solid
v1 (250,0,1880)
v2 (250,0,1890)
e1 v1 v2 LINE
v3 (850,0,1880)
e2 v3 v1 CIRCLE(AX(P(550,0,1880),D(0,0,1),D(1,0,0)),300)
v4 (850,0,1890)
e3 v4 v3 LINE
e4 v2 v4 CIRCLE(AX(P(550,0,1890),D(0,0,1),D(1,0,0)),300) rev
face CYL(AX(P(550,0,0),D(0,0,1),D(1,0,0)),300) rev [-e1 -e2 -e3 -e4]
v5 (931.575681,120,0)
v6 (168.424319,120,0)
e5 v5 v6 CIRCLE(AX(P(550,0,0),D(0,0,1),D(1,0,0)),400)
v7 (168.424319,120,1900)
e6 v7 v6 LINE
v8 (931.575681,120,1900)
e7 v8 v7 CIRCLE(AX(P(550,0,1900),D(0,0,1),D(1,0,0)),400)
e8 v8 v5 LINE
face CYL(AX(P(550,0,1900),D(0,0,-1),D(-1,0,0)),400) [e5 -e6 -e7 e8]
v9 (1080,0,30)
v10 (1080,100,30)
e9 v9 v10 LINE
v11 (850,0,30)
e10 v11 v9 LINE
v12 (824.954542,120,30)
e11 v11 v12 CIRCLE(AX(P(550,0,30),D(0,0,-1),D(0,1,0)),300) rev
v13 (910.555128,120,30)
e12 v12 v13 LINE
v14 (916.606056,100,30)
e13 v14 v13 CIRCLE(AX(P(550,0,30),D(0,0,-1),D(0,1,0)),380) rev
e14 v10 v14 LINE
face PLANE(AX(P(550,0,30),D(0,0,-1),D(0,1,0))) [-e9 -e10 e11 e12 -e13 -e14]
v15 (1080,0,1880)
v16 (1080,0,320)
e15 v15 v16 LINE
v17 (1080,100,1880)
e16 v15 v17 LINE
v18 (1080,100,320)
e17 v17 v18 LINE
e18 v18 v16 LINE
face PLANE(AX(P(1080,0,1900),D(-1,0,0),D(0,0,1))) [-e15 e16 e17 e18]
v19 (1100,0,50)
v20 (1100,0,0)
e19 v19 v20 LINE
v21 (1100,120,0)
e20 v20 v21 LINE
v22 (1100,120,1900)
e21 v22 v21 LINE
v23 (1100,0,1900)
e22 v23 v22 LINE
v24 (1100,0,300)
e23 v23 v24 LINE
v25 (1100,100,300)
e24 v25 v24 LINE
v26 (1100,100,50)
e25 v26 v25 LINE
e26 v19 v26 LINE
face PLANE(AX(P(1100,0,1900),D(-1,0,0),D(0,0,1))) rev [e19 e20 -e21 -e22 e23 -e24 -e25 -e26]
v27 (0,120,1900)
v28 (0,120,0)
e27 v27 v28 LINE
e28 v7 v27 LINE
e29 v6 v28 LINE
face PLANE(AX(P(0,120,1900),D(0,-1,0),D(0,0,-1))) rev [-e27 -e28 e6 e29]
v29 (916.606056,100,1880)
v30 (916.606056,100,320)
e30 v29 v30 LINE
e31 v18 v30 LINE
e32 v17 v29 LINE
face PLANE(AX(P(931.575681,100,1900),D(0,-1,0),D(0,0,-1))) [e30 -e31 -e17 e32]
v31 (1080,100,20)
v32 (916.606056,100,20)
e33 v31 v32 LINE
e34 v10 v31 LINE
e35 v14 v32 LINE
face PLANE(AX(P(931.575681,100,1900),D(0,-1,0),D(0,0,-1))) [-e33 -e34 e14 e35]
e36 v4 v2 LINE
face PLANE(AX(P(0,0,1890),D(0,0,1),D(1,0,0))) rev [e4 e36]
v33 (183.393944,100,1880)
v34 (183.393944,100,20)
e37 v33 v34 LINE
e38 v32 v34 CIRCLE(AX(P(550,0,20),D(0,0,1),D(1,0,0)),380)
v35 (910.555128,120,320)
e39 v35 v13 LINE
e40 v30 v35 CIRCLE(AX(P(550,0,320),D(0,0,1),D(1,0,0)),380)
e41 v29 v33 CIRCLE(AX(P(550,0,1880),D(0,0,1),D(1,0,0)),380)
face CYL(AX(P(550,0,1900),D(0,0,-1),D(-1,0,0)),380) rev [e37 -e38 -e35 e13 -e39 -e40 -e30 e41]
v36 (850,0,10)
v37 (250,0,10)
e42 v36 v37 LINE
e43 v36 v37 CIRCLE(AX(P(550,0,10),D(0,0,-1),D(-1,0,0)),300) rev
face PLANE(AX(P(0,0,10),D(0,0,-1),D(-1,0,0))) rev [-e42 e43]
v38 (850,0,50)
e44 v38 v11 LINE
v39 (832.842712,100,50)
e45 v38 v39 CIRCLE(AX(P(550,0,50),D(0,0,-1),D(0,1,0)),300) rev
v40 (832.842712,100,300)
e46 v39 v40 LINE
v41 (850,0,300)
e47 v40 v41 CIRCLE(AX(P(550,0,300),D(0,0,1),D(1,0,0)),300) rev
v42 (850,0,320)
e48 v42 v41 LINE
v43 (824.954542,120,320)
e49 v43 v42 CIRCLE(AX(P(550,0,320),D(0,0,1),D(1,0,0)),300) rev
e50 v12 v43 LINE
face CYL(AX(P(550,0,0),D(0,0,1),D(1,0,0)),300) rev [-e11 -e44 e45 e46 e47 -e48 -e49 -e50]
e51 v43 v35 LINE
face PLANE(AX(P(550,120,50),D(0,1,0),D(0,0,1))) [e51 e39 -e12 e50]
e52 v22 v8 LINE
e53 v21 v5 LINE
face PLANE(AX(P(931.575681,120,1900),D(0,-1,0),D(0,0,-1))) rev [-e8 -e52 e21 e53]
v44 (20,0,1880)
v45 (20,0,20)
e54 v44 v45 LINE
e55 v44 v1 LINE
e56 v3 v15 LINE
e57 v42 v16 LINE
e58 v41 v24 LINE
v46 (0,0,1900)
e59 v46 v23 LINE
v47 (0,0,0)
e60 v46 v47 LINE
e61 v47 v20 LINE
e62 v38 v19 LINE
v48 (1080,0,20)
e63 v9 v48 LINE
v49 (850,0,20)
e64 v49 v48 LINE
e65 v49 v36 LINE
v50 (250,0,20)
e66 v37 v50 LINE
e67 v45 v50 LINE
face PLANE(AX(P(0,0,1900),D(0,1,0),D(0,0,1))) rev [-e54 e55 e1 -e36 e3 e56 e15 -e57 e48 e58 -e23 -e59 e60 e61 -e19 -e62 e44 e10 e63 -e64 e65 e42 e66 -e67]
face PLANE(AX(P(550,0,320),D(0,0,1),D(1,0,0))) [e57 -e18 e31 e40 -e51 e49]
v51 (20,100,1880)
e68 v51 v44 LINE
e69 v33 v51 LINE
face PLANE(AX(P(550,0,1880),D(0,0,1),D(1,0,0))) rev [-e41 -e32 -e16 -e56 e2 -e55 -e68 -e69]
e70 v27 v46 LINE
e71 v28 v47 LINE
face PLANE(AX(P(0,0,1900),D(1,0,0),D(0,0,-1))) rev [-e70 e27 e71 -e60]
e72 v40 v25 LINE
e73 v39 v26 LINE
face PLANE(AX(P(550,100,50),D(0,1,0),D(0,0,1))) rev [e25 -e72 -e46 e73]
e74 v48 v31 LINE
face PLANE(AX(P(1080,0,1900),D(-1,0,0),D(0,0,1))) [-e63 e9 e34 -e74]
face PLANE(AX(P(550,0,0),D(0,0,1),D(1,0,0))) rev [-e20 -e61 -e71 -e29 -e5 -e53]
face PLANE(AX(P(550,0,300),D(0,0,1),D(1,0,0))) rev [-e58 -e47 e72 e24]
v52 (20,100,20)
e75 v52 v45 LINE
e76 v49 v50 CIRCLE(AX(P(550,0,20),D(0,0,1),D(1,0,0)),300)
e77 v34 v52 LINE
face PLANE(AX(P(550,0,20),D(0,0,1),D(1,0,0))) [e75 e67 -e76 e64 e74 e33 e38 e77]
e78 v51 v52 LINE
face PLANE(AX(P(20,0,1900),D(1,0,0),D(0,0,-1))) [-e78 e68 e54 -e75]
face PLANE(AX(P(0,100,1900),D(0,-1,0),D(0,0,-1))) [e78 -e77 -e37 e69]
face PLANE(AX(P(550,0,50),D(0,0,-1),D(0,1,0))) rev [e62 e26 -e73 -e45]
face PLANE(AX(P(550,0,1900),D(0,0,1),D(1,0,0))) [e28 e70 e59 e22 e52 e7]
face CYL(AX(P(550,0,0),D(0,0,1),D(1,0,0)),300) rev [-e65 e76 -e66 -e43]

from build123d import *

# Parameters (mm, degrees)
BOSS_EXTRUDE1_DEPTH = 1900
SKETCH2_R           = 300
CUT_EXTRUDE1_DEPTH  = 2232.591360442
SKETCH4_W           = 250
SKETCH4_H           = 100
CUT_EXTRUDE3_DEPTH  = 550
SHELL1_START        = 320
SHELL1_DEPTH        = 1560
SHELL1_START_2      = 20
SHELL1_2_DEPTH      = 300
SHELL1_3_DEPTH      = 10
BOSS_EXTRUDE2_START = -10
BOSS_EXTRUDE2_DEPTH = 10
BOSS_EXTRUDE3_DEPTH = 10


# Read off the part's stored shape, not the designer's step: Shell1
with BuildPart() as part:
    # Sketch1 → Boss-Extrude1 (new body)
    with BuildSketch(Plane.XY):
        with BuildLine():
            Line((931.575680567, 120), (1100, 120))
            Line((1100, 120), (1100, 0))
            Line((1100, 0), (0, 0))
            Line((0, 0), (0, 120))
            Line((0, 120), (168.424319433, 120))
            ThreePointArc((168.424319433, 120), (550, 400), (931.575680567, 120))
        make_face()
    extrude(amount=BOSS_EXTRUDE1_DEPTH)

    # Sketch2 → Cut-Extrude1 (cut, through all)
    with BuildSketch(Plane.XY.offset(1900)):
        with Locations((550, 0)):
            Circle(SKETCH2_R)
    extrude(amount=-CUT_EXTRUDE1_DEPTH, mode=Mode.SUBTRACT)

    # Sketch4 → Cut-Extrude3 (cut)
    with BuildSketch(Plane(origin=(1100, 0, 0), x_dir=(0, 0, -1), z_dir=(1, 0, 0))):
        with Locations((-175, 50)):
            Rectangle(SKETCH4_W, SKETCH4_H)
    extrude(amount=-CUT_EXTRUDE3_DEPTH, mode=Mode.SUBTRACT)

    # Shell1 outline → Shell1 (cut)
    with BuildSketch(Plane.XY.offset(SHELL1_START)):
        with BuildLine():
            ThreePointArc((916.606055596, 100), (550, 380), (183.393944404, 100))
            Line((183.393944404, 100), (20, 100))
            Line((20, 100), (20, 0))
            Line((20, 0), (250, 0))
            ThreePointArc((250, 0), (550, 300), (850, 0))
            Line((850, 0), (1080, 0))
            Line((1080, 0), (1080, 100))
            Line((1080, 100), (916.606055596, 100))
        make_face()
    extrude(amount=SHELL1_DEPTH, mode=Mode.SUBTRACT)

    # Shell1 2 outline → Shell1 2 (cut)
    with BuildSketch(Plane.XY.offset(SHELL1_START_2)):
        with BuildLine():
            Line((824.954541697, 120), (910.555127546, 120))
            ThreePointArc((910.555127546, 120), (539.552347988, 379.856349911), (183.393944404, 100))
            Line((183.393944404, 100), (20, 100))
            Line((20, 100), (20, 0))
            Line((20, 0), (250, 0))
            ThreePointArc((250, 0), (488.707106893, 293.671893879), (824.954541697, 120))
        make_face()
    extrude(amount=SHELL1_2_DEPTH, mode=Mode.SUBTRACT)

    # Shell1 3 outline → Shell1 3 (cut)
    with BuildSketch(Plane.XY.offset(SHELL1_START_2)):
        with BuildLine():
            ThreePointArc((916.606055596, 100), (913.718086665, 110.041598646), (910.555127546, 120))
            Line((910.555127546, 120), (824.954541697, 120))
            ThreePointArc((824.954541697, 120), (843.671893879, 61.292893107), (850, 0))
            Line((850, 0), (1080, 0))
            Line((1080, 0), (1080, 100))
            Line((1080, 100), (916.606055596, 100))
        make_face()
    extrude(amount=SHELL1_3_DEPTH, mode=Mode.SUBTRACT)

    # Sketch5 → Boss-Extrude2 (add)
    with BuildSketch(Plane(origin=(0, 0, 0), x_dir=(-1, 0, 0), z_dir=(0, 0, -1)).offset(BOSS_EXTRUDE2_START)):
        with BuildLine():
            Line((-850, 0), (-250, 0))
            ThreePointArc((-250, 0), (-550, 300), (-850, 0))
        make_face()
    extrude(amount=BOSS_EXTRUDE2_DEPTH)

    # Sketch6 → Boss-Extrude3 (add)
    with BuildSketch(Plane.XY.offset(1900)):
        with BuildLine():
            Line((850, 0), (250, 0))
            ThreePointArc((250, 0), (550, 300), (850, 0))
        make_face()
    extrude(amount=-BOSS_EXTRUDE3_DEPTH)


solid = part.part
